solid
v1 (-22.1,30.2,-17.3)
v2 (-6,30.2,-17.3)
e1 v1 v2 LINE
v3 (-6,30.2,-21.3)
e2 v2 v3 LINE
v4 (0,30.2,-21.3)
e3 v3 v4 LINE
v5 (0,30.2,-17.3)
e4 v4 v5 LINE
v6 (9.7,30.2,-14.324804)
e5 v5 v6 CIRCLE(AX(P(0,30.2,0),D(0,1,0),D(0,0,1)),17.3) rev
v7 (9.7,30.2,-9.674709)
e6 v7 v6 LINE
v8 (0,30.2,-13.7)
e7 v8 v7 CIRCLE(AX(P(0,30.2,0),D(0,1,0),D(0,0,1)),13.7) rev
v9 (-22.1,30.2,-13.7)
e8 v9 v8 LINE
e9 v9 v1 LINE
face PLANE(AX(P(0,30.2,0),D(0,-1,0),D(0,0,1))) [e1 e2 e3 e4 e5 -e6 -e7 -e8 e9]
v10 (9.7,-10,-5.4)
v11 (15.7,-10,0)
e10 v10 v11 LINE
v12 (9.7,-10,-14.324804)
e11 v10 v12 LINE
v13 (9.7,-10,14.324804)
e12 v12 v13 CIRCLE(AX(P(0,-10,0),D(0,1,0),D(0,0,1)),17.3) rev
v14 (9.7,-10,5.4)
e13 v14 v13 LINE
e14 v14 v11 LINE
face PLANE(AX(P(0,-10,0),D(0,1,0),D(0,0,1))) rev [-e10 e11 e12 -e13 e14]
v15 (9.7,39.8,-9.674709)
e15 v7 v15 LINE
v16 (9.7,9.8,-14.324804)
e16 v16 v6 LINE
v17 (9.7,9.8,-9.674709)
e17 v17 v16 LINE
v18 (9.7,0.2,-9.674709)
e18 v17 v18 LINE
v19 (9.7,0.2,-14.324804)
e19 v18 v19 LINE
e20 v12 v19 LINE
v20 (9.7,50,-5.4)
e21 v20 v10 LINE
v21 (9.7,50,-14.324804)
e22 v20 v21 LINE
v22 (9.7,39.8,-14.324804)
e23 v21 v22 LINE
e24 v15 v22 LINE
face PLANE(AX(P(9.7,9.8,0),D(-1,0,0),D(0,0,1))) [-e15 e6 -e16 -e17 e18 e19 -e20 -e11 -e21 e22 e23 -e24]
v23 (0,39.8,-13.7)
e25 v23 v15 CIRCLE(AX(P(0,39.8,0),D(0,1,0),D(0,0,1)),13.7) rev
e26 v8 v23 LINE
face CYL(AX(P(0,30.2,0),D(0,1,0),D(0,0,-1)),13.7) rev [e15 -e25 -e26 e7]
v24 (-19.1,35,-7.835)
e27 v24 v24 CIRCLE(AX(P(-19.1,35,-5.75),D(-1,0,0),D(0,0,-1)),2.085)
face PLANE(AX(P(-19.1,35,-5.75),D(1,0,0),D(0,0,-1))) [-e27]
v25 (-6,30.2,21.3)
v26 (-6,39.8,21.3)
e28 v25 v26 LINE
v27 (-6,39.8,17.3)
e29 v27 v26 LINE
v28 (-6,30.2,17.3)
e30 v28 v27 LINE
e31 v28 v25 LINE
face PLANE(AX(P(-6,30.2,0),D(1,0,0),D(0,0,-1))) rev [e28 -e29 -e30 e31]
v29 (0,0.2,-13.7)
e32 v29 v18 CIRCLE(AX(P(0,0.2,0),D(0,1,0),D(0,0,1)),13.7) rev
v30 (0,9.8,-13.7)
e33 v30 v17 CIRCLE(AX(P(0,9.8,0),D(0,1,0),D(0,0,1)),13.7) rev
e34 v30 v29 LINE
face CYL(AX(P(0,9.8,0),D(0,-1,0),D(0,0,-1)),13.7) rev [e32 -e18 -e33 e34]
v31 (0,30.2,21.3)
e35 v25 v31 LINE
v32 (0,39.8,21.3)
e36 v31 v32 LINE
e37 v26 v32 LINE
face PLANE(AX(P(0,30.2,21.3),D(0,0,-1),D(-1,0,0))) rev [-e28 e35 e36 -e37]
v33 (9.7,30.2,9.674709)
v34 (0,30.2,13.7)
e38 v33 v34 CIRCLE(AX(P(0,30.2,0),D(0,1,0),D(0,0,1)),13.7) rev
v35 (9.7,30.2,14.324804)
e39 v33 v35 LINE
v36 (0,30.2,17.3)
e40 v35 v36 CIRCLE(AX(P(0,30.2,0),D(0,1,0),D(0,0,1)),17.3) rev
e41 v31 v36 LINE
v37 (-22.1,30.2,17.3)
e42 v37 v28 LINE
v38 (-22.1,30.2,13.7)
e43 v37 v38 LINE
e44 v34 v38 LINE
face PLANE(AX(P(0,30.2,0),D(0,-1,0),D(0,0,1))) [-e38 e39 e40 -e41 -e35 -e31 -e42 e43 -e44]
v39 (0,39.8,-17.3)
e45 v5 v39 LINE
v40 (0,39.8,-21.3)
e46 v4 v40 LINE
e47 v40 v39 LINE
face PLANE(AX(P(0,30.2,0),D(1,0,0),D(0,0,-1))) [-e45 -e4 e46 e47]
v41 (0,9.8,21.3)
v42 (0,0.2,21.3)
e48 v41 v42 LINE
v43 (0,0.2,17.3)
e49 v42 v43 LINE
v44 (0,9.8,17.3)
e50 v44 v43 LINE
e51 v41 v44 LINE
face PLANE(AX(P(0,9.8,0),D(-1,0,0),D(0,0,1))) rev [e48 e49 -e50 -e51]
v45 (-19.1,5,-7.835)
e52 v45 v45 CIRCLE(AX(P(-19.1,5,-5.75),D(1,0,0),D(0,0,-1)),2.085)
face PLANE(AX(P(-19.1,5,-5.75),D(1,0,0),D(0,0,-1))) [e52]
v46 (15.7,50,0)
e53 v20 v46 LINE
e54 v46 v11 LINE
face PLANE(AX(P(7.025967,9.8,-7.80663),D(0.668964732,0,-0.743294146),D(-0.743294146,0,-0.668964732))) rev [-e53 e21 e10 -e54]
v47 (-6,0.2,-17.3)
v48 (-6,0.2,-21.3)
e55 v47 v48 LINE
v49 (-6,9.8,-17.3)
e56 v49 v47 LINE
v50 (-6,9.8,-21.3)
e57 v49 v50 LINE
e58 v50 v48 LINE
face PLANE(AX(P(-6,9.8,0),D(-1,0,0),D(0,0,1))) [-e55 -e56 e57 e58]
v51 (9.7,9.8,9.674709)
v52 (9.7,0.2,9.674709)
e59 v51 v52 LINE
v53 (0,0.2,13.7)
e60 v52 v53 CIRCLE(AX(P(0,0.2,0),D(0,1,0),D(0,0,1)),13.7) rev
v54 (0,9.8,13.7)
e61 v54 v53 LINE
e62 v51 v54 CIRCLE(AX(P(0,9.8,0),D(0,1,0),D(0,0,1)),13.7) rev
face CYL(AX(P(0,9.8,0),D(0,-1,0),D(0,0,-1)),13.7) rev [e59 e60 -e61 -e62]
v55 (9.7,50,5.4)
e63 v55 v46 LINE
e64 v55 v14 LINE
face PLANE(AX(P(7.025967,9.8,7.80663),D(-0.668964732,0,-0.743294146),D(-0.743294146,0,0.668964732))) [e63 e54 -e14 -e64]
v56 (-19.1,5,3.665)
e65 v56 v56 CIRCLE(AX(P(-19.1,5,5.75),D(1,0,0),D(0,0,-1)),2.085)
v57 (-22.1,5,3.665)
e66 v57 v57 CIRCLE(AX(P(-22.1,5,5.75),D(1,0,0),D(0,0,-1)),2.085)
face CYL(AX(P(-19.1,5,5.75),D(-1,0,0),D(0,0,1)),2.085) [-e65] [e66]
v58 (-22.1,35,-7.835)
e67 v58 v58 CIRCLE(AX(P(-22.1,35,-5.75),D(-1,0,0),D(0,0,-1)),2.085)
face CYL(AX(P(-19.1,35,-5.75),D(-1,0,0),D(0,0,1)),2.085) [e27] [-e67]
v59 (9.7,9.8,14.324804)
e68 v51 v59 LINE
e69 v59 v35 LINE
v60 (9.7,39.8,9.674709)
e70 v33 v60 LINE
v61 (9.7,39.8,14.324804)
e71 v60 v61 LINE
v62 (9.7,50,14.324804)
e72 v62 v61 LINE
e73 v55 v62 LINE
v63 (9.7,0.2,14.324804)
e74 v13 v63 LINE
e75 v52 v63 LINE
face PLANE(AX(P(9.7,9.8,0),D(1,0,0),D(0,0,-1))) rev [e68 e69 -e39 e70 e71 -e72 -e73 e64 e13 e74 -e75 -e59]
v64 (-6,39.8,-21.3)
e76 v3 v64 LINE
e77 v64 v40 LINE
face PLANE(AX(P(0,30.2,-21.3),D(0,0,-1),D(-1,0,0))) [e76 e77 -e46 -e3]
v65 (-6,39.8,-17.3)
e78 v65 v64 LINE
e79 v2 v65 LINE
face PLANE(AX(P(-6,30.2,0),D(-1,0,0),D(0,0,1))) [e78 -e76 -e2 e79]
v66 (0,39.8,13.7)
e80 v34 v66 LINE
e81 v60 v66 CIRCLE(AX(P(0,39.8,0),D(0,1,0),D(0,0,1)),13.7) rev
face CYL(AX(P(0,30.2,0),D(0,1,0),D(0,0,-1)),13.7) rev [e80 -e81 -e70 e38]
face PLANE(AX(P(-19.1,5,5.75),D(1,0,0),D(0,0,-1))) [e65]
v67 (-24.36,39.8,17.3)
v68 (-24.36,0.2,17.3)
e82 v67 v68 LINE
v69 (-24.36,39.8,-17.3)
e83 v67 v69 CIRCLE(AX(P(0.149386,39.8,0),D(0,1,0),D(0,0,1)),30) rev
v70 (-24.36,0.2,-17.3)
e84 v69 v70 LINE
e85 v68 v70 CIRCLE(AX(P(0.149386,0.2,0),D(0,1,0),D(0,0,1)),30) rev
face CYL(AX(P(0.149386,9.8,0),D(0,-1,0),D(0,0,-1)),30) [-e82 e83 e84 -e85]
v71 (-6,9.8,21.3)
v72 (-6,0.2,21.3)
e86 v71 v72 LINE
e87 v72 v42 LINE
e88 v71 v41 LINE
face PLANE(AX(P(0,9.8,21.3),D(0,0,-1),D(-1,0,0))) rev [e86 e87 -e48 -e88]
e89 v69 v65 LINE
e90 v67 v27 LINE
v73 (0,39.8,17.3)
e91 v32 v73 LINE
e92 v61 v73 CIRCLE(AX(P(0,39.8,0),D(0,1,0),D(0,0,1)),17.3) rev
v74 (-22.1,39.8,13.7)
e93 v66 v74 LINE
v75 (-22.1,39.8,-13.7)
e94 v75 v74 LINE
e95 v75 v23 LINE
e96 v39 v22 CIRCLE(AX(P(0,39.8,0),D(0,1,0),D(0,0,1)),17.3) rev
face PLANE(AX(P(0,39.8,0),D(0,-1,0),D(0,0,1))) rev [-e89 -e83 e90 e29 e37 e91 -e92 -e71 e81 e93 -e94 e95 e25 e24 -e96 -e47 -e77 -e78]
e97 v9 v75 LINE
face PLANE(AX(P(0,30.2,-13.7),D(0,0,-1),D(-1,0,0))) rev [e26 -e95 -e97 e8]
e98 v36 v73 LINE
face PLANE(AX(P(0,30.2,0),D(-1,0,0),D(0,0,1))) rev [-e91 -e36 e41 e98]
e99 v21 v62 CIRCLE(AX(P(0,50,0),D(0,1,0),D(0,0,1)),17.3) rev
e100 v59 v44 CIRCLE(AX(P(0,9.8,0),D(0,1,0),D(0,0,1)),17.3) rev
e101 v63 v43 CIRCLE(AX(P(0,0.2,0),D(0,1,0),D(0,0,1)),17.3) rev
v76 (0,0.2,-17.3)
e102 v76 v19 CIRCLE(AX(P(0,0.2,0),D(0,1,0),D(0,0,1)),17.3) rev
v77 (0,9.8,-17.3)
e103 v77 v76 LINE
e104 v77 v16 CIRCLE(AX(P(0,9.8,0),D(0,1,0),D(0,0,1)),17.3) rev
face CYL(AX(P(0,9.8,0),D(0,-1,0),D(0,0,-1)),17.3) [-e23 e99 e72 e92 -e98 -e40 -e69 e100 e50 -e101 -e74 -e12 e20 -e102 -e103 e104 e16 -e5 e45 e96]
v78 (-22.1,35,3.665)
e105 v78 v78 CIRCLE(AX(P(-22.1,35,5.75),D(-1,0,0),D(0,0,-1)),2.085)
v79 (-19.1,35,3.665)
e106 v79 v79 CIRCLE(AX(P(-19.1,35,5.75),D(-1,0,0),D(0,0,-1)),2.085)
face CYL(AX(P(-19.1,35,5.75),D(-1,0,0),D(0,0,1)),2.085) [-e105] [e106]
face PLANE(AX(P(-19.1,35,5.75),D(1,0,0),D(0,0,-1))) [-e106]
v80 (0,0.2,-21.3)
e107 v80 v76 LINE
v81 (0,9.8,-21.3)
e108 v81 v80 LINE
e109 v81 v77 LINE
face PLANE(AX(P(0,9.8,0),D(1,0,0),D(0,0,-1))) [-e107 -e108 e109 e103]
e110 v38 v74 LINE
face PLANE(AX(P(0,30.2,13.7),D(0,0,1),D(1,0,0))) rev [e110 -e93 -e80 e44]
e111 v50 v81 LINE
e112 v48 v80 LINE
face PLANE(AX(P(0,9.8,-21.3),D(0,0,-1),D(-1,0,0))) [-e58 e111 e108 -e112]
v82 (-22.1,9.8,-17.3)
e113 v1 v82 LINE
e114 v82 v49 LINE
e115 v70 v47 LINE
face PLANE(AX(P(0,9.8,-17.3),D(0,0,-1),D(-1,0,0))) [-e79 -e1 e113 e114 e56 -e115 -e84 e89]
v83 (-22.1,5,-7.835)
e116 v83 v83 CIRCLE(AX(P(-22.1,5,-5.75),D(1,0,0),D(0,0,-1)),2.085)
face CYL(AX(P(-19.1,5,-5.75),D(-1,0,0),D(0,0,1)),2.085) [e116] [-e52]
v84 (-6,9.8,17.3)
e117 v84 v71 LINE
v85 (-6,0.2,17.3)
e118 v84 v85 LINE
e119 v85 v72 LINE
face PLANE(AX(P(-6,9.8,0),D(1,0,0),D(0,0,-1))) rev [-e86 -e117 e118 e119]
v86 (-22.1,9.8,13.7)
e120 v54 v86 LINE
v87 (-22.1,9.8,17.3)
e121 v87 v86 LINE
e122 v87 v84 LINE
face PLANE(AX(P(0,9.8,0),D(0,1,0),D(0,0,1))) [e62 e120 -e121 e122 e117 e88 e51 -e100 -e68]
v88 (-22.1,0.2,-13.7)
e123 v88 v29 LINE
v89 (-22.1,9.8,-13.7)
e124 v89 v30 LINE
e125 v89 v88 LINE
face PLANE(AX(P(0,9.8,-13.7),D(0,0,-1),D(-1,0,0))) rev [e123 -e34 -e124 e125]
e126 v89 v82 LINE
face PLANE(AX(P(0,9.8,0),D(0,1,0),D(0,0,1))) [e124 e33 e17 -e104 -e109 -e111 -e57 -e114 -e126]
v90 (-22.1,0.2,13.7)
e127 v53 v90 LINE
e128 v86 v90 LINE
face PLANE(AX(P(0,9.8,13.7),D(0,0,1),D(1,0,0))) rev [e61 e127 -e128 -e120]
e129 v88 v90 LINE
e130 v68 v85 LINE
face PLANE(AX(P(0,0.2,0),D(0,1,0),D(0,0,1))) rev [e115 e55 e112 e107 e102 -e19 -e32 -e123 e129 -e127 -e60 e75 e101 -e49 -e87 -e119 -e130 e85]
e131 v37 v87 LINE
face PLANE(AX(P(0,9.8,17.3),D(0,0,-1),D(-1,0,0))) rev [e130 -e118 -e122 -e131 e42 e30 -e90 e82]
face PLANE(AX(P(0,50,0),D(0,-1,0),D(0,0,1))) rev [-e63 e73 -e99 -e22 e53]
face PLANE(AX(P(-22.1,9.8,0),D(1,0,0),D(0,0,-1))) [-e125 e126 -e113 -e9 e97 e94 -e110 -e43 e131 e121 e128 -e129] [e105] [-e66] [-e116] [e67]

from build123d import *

# Parameters (mm, degrees)
BOSS_EXTRUDE1_START = 0.2
BOSS_EXTRUDE1_DEPTH = 9.6
BOSS_EXTRUDE2_START = -10
BOSS_EXTRUDE2_DEPTH = 30
MIRROR1_START       = 9.8
MIRROR1_DEPTH       = 30
MIRROR1_START_2     = 30.2
MIRROR1_2_DEPTH     = 9.6
MIRROR1_START_3     = 39.8
MIRROR1_3_DEPTH     = 10.2
MIRROR1_START_4     = -22.1
MIRROR1_4_OUTLINE_R = 2.085
MIRROR1_4_DEPTH     = 3


with BuildPart() as part:
    # Sketch1 → Boss-Extrude1 (new body)
    with BuildSketch(Plane(origin=(0, 0, 0), x_dir=(1, 0, 0), z_dir=(0, 1, 0)).offset(BOSS_EXTRUDE1_START)):
        with BuildLine():
            ThreePointArc((-24.36, 17.3), (-29.850614043, 0), (-24.36, -17.3))
            Line((-24.36, -17.3), (-6, -17.3))
            Line((-6, -17.3), (-6, -21.3))
            Line((-6, -21.3), (0, -21.3))
            Line((0, -21.3), (0, -17.3))
            ThreePointArc((0, -17.3), (17.3, 0), (0, 17.3))
            Line((0, 17.3), (0, 21.3))
            Line((0, 21.3), (-6, 21.3))
            Line((-6, 21.3), (-6, 17.3))
            Line((-6, 17.3), (-24.36, 17.3))
        make_face()
        with BuildLine():
            Line((0, -13.7), (-22.1, -13.7))
            Line((-22.1, -13.7), (-22.1, 13.7))
            Line((-22.1, 13.7), (0, 13.7))
            ThreePointArc((0, 13.7), (5.251022882, 12.653725091), (9.7, 9.674709298))
            Line((9.7, 9.674709298), (9.7, 5.4))
            Line((9.7, 5.4), (15.7, 0))
            Line((15.7, 0), (9.7, -5.4))
            Line((9.7, -5.4), (9.7, -9.674709298))
            ThreePointArc((9.7, -9.674709298), (5.251022882, -12.653725091), (0, -13.7))
        make_face(mode=Mode.SUBTRACT)
    extrude(amount=BOSS_EXTRUDE1_DEPTH)

    # Sketch1<3> → Boss-Extrude2 (add)
    with BuildSketch(Plane(origin=(0, 0, 0), x_dir=(1, 0, 0), z_dir=(0, 1, 0)).offset(BOSS_EXTRUDE2_START)):
        with BuildLine():
            Line((9.7, 14.324803664), (9.7, 9.674709298))
            ThreePointArc((9.7, 9.674709298), (12.261151879, 6.111804528), (13.564518925, 1.921932967))
            Line((13.564518925, 1.921932967), (15.7, 0))
            Line((15.7, 0), (13.564518925, -1.921932967))
            ThreePointArc((13.564518925, -1.921932967), (12.261151879, -6.111804528), (9.7, -9.674709298))
            Line((9.7, -9.674709298), (9.7, -14.324803664))
            ThreePointArc((9.7, -14.324803664), (17.3, 0), (9.7, 14.324803664))
        make_face()
        with BuildLine():
            Line((9.7, -5.4), (9.7, -9.674709298))
            ThreePointArc((9.7, -9.674709298), (12.261151879, -6.111804528), (13.564518925, -1.921932967))
            Line((13.564518925, -1.921932967), (9.7, -5.4))
        make_face()
        with BuildLine():
            ThreePointArc((13.564518925, 1.921932967), (12.261151879, 6.111804528), (9.7, 9.674709298))
            Line((9.7, 9.674709298), (9.7, 5.4))
            Line((9.7, 5.4), (13.564518925, 1.921932967))
        make_face()
    extrude(amount=BOSS_EXTRUDE2_DEPTH)

    # Mirror1: read off the stored shape, not the designer's step
    # Mirror1 outline → Mirror1 (add)
    with BuildSketch(Plane(origin=(0, 0, 0), x_dir=(1, 0, 0), z_dir=(0, 1, 0)).offset(MIRROR1_START)):
        with BuildLine():
            Line((-22.1, -17.3), (-22.1, 17.3))
            Line((-22.1, 17.3), (-24.36, 17.3))
            ThreePointArc((-24.36, 17.3), (-29.850614043, 0), (-24.36, -17.3))
            Line((-24.36, -17.3), (-22.1, -17.3))
        make_face()
        with BuildLine():
            Line((9.7, -5.4), (9.7, -14.324803664))
            ThreePointArc((9.7, -14.324803664), (17.3, 0), (9.7, 14.324803664))
            Line((9.7, 14.324803664), (9.7, 5.4))
            Line((9.7, 5.4), (15.7, 0))
            Line((15.7, 0), (9.7, -5.4))
        make_face()
    extrude(amount=MIRROR1_DEPTH)

    # Mirror1 2 outline → Mirror1 2 (add)
    with BuildSketch(Plane(origin=(0, 0, 0), x_dir=(1, 0, 0), z_dir=(0, 1, 0)).offset(MIRROR1_START_2)):
        with BuildLine():
            Line((0, -13.7), (-22.1, -13.7))
            Line((-22.1, -13.7), (-22.1, -17.3))
            Line((-22.1, -17.3), (-6, -17.3))
            Line((-6, -17.3), (-6, -21.3))
            Line((-6, -21.3), (0, -21.3))
            Line((0, -21.3), (0, -17.3))
            ThreePointArc((0, -17.3), (5.073011759, -16.539484626), (9.7, -14.324803664))
            Line((9.7, -14.324803664), (9.7, -9.674709298))
            ThreePointArc((9.7, -9.674709298), (5.251022882, -12.653725091), (0, -13.7))
        make_face()
        with BuildLine():
            Line((-22.1, 17.3), (-22.1, 13.7))
            Line((-22.1, 13.7), (0, 13.7))
            ThreePointArc((0, 13.7), (5.251022882, 12.653725091), (9.7, 9.674709298))
            Line((9.7, 9.674709298), (9.7, 14.324803664))
            ThreePointArc((9.7, 14.324803664), (5.073011759, 16.539484626), (0, 17.3))
            Line((0, 17.3), (0, 21.3))
            Line((0, 21.3), (-6, 21.3))
            Line((-6, 21.3), (-6, 17.3))
            Line((-6, 17.3), (-22.1, 17.3))
        make_face()
    extrude(amount=MIRROR1_2_DEPTH)

    # Mirror1 3 outline → Mirror1 3 (add)
    with BuildSketch(Plane(origin=(0, 0, 0), x_dir=(1, 0, 0), z_dir=(0, 1, 0)).offset(MIRROR1_START_3)):
        with BuildLine():
            Line((9.7, -5.4), (9.7, -14.324803664))
            ThreePointArc((9.7, -14.324803664), (17.3, 0), (9.7, 14.324803664))
            Line((9.7, 14.324803664), (9.7, 5.4))
            Line((9.7, 5.4), (15.7, 0))
            Line((15.7, 0), (9.7, -5.4))
        make_face()
    extrude(amount=MIRROR1_3_DEPTH)

    # Mirror1 4 outline → Mirror1 4 (add)
    with BuildSketch(Plane.YZ.offset(MIRROR1_START_4)):
        with Locations((5, 5.75)):
            Circle(MIRROR1_4_OUTLINE_R)
        with Locations((5, -5.75)):
            Circle(MIRROR1_4_OUTLINE_R)
        with Locations((35, 5.75)):
            Circle(MIRROR1_4_OUTLINE_R)
        with Locations((35, -5.75)):
            Circle(MIRROR1_4_OUTLINE_R)
    extrude(amount=MIRROR1_4_DEPTH)


solid = part.part
